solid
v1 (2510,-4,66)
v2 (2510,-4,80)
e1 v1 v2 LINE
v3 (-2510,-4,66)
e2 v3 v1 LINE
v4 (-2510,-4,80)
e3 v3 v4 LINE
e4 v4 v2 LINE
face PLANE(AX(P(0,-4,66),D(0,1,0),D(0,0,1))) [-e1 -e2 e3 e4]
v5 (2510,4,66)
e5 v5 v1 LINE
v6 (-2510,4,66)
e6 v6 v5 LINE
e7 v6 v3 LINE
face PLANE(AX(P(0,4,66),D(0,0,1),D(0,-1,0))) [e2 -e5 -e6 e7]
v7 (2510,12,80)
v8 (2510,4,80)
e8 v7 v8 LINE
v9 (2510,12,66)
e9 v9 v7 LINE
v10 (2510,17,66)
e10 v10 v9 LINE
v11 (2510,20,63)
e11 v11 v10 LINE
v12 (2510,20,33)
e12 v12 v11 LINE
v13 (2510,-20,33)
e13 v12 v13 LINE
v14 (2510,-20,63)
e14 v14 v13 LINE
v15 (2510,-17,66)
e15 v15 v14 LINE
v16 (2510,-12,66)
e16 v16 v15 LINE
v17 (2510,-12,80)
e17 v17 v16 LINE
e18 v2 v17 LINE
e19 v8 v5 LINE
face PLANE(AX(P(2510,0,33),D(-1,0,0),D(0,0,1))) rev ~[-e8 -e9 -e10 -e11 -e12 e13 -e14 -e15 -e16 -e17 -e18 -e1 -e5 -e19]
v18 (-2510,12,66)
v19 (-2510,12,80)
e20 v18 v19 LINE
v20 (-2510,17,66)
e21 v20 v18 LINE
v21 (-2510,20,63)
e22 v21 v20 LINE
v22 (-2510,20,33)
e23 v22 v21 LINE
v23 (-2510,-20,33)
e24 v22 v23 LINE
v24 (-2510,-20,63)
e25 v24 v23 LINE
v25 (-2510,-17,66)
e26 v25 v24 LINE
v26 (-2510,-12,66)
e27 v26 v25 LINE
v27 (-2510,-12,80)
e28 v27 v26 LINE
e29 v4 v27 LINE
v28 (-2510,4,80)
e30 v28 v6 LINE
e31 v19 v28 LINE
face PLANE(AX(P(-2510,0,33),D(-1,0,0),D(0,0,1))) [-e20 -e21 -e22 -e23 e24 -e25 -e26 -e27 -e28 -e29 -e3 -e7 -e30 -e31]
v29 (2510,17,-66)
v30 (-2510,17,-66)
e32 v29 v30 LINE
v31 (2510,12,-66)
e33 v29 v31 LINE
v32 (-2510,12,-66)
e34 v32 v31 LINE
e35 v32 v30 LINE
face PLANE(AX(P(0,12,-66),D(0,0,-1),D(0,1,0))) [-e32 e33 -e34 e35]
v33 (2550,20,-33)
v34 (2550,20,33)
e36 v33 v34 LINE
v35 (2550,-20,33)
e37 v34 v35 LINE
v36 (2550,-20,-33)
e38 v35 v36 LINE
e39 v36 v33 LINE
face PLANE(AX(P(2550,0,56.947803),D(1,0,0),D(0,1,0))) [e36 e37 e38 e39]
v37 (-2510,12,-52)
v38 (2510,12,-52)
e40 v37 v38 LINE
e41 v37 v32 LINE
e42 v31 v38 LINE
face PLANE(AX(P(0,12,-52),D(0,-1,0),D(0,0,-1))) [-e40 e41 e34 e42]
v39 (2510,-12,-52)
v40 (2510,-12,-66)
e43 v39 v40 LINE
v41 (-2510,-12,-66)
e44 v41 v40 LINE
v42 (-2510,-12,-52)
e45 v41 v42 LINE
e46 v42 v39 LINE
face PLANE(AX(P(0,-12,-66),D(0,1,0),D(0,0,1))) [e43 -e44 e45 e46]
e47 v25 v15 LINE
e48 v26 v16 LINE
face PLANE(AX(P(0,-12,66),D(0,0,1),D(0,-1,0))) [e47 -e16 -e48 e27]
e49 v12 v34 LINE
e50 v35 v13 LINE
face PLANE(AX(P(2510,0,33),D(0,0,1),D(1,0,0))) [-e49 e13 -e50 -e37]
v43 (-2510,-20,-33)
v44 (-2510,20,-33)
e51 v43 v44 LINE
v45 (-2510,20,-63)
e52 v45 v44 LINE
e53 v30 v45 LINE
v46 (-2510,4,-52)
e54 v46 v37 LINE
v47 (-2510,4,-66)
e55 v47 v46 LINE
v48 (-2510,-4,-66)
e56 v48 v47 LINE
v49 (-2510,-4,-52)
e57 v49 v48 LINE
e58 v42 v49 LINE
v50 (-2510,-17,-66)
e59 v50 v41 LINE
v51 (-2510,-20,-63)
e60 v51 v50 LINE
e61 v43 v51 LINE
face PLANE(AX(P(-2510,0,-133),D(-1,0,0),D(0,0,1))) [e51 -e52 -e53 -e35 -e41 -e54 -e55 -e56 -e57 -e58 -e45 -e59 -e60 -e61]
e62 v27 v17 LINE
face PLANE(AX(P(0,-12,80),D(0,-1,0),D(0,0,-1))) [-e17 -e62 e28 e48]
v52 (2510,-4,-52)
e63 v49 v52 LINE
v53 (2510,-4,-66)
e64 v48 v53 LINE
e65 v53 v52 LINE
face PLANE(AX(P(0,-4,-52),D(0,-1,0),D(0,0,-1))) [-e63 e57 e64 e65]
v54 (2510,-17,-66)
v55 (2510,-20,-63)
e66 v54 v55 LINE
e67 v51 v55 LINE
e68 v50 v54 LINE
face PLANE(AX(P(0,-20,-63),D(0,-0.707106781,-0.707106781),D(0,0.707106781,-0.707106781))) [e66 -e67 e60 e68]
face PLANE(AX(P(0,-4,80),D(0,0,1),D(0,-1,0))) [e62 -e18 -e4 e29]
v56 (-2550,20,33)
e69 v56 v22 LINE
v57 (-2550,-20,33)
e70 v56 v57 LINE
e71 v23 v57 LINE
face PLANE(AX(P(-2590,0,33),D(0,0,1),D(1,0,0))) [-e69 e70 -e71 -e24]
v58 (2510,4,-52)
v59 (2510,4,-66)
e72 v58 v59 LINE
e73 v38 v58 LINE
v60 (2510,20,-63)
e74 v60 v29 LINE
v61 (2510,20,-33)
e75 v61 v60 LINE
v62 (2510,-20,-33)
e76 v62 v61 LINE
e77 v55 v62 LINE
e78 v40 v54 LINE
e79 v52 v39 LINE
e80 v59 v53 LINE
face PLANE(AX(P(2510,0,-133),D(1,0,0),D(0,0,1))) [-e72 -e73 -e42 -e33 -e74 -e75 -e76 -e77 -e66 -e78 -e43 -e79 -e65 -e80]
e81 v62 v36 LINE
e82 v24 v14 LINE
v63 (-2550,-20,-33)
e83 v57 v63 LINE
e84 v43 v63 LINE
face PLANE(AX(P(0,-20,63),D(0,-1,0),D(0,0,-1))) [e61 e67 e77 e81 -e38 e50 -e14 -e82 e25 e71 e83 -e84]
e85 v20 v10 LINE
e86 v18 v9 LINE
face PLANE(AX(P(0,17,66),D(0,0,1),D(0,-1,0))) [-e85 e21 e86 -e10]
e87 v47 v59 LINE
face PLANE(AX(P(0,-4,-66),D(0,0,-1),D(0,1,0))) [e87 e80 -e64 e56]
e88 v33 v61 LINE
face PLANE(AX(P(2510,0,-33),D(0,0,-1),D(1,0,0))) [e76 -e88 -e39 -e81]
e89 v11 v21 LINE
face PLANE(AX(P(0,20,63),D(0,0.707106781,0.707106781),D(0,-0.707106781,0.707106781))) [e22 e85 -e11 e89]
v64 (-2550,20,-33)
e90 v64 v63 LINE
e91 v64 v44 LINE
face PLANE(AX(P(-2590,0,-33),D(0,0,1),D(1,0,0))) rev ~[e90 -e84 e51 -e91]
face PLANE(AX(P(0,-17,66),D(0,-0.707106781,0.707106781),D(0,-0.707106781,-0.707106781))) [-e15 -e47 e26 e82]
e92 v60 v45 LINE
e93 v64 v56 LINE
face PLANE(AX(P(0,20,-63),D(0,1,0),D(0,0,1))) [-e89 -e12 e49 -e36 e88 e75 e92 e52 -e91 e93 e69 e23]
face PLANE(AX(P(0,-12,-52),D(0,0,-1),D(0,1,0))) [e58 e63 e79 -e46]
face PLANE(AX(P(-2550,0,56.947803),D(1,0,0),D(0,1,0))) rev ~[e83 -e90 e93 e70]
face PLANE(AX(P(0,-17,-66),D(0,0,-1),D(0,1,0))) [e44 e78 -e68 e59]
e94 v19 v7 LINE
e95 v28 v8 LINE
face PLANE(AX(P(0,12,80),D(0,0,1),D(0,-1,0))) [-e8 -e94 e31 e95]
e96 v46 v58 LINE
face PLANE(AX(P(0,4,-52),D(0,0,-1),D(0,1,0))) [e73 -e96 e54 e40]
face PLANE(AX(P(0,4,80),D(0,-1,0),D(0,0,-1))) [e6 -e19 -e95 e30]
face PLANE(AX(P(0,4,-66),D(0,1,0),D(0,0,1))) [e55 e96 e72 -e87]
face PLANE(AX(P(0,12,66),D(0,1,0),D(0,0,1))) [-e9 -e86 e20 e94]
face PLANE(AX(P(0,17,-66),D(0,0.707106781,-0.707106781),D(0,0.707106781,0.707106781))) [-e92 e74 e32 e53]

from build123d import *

# Parameters (mm, degrees)
F1_W     = 40
F1_H     = 33
F3_DEPTH = 2550
F2_W     = 80
F2_H     = 100
F4_DEPTH = 25


with BuildPart() as f3:
    # F1 (on Right) → F3 (new body, symmetric)
    with BuildSketch(Plane.YZ):
        Polygon((20, 33), (20, 63), (17, 66), (12, 66), (12, 80), (4, 80), (4, 66), (-4, 66), (-4, 80), (-12, 80), (-12, 66), (-17, 66), (-20, 63), (-20, 33), align=None)
        with Locations((0, 16.5)):
            Rectangle(F1_W, F1_H)
        with Locations((0, -16.5)):
            Rectangle(F1_W, F1_H)
        Polygon((20, -63), (20, -33), (-20, -33), (-20, -63), (-17, -66), (-12, -66), (-12, -52), (-4, -52), (-4, -66), (4, -66), (4, -52), (12, -52), (12, -66), (17, -66), align=None)
    extrude(amount=F3_DEPTH, both=True)

    # F2 (on Front) → F4 (cut, symmetric)
    with BuildSketch(Plane.XZ):
        with Locations((-2550, 83)):
            Rectangle(F2_W, F2_H)
        with Locations((-2550, -83)):
            Rectangle(F2_W, F2_H)
        with Locations((2550, 83)):
            Rectangle(F2_W, F2_H)
        with Locations((2550, -83)):
            Rectangle(F2_W, F2_H)
    extrude(amount=F4_DEPTH, both=True, mode=Mode.SUBTRACT)


solid = f3.part
